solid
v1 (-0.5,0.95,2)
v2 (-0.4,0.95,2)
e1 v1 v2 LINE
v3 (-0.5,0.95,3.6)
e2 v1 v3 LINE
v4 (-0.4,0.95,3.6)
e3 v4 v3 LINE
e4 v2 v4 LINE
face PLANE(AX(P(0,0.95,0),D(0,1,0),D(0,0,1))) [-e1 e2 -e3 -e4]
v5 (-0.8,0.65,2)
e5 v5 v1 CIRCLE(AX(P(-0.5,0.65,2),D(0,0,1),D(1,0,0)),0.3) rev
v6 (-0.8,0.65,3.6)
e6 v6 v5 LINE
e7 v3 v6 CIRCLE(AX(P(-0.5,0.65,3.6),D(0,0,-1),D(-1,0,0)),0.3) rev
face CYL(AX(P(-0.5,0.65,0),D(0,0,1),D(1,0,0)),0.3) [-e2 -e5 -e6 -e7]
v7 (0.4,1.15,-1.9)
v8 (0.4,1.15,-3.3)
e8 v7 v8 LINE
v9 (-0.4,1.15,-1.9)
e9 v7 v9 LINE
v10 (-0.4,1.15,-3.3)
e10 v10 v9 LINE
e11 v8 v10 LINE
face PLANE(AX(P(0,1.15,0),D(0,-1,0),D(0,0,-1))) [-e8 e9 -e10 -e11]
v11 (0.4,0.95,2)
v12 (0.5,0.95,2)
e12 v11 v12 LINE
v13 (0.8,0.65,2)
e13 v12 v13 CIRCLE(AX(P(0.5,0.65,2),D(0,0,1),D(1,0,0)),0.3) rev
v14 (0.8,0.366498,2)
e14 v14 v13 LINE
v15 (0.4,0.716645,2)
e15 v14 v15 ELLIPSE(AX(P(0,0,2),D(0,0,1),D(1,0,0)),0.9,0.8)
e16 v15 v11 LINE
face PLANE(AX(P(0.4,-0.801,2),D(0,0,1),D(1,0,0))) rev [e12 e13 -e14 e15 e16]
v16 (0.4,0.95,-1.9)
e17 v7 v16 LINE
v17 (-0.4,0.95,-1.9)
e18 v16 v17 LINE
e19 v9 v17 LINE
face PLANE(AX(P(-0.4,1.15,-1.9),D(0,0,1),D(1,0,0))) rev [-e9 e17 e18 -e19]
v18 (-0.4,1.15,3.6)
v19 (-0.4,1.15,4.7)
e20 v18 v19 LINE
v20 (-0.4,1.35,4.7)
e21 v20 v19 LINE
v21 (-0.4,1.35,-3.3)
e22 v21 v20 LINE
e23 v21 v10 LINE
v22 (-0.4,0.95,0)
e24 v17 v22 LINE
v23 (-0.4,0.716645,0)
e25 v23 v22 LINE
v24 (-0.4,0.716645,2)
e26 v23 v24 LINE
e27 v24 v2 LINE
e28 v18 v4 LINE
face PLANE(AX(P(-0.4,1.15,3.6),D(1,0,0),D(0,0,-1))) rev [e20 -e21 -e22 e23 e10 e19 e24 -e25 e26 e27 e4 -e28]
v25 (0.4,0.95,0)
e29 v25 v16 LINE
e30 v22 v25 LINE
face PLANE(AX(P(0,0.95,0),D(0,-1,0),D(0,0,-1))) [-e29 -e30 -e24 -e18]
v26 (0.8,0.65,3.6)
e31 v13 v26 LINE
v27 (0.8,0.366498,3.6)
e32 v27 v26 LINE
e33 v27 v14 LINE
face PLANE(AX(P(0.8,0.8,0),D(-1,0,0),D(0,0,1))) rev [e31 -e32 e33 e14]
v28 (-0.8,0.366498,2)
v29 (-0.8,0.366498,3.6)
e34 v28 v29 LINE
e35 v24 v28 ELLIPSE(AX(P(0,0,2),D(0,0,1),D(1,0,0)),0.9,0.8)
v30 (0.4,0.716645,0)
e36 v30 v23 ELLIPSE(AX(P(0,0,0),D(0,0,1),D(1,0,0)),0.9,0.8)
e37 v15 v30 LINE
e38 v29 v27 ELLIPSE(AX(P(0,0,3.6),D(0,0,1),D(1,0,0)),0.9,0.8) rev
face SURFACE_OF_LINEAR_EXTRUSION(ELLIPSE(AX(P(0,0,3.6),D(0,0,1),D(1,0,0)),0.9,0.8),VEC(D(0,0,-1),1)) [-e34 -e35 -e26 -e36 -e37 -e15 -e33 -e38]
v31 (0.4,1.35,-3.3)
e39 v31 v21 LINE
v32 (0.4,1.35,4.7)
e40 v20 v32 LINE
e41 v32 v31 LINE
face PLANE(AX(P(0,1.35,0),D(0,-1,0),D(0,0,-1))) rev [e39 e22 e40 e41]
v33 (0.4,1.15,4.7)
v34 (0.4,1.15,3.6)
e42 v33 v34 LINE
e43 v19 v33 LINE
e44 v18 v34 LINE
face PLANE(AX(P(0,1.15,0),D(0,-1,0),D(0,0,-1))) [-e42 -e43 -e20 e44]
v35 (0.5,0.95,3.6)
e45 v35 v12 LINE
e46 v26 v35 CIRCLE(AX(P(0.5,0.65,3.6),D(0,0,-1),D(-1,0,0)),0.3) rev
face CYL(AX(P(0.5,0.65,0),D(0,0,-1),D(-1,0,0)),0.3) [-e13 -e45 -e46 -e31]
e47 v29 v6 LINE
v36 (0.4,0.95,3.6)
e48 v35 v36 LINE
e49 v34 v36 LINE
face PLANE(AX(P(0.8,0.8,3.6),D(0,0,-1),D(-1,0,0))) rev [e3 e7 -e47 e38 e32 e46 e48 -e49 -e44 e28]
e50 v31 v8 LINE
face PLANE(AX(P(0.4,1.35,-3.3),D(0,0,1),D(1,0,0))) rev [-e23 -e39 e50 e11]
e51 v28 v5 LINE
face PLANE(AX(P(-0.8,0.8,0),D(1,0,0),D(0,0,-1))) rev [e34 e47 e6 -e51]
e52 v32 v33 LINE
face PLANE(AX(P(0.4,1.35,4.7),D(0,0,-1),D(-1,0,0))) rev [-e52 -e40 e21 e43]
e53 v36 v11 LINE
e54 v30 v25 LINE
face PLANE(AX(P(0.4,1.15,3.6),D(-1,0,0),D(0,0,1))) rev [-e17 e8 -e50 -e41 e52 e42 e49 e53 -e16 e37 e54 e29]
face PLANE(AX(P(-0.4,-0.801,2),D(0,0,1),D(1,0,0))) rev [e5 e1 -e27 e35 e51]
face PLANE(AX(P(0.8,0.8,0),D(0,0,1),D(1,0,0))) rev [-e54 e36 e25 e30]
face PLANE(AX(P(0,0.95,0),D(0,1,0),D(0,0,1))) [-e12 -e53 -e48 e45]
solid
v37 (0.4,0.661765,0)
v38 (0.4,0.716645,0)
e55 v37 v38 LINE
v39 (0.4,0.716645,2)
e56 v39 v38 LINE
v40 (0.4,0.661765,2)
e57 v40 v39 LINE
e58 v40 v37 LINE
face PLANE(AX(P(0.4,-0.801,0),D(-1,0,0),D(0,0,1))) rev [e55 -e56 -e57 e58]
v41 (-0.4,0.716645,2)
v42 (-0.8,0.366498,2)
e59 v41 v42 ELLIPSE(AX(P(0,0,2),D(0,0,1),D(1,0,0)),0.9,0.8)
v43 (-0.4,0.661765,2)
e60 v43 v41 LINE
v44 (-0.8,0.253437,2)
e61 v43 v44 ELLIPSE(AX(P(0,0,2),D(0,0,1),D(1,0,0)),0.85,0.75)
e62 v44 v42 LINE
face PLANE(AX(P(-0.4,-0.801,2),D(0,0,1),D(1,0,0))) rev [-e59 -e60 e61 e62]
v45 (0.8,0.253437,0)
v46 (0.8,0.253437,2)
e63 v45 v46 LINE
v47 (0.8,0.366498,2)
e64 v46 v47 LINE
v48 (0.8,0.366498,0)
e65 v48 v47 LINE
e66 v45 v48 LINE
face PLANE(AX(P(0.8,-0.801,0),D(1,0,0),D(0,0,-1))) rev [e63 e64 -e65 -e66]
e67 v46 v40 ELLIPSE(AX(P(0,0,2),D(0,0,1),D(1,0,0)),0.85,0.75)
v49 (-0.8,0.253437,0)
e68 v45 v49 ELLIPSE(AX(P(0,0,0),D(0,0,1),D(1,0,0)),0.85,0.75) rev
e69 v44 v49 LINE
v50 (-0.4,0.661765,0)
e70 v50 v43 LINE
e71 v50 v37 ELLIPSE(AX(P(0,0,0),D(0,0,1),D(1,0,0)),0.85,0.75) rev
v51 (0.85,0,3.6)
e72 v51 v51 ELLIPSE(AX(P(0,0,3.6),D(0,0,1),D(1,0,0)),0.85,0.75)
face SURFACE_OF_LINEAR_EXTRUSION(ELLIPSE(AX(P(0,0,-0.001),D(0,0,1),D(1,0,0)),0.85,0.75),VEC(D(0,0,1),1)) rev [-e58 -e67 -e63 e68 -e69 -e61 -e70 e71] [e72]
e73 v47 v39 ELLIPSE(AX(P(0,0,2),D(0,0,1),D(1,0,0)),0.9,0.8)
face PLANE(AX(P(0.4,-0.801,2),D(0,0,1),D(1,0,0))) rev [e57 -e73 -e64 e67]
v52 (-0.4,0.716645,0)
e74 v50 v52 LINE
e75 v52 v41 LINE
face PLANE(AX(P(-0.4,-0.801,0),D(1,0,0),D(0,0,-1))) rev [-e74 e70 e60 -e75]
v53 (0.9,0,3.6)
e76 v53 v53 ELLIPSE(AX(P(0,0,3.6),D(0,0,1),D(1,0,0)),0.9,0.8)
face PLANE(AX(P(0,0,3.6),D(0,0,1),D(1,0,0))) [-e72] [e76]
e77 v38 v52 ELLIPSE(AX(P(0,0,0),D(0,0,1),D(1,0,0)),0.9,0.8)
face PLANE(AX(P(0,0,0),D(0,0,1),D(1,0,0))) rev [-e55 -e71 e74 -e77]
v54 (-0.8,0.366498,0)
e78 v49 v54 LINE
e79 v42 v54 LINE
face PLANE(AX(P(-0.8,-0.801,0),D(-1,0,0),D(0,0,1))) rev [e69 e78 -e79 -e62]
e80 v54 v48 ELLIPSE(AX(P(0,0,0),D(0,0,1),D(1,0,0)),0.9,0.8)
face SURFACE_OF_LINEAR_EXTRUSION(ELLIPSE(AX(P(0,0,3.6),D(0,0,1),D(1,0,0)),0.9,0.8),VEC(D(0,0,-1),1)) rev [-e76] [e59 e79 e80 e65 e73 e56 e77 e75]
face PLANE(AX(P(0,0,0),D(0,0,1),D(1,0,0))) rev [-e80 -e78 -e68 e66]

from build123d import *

# Parameters (mm, degrees)
SKETCH1_RX          = 0.9
SKETCH1_RY          = 0.8
BOSS_EXTRUDE1_DEPTH = 3.6
CUT_EXTRUDE2_REACH  = 5.796
SKETCH2_RX          = 0.85
SKETCH2_RY          = 0.75
BOSS_EXTRUDE3_DEPTH = 3.6
SKETCH3_W           = 0.8
SKETCH3_H           = 5.5
BOSS_EXTRUDE4_DEPTH = 0.2
SKETCH4_W           = 0.8
SKETCH4_H           = 8
BOSS_EXTRUDE5_DEPTH = 0.2
FILLET2_R           = 0.3
CUT_EXTRUDE4_START  = -0.696564
SKETCH5_W           = 0.4
SKETCH5_H           = 2
CUT_EXTRUDE4_DEPTH  = 0.696564


# Read off the part's stored shape, not the designer's step: Boss-Extrude3
with BuildPart() as part:
    # Sketch1 → Boss-Extrude1 (new body)
    with BuildSketch(Plane.XY):
        with Locations((0, 0)):
            Ellipse(SKETCH1_RX, SKETCH1_RY)
    extrude(amount=BOSS_EXTRUDE1_DEPTH)

    # Sketch2 → Cut-Extrude2 (cut, up to next)
    with BuildSketch(Plane.XY.offset(3.6), mode=Mode.PRIVATE) as cut_extrude2_sk1:
        with Locations((0, 0)):
            Ellipse(SKETCH2_RX, SKETCH2_RY)
    cut_extrude2_tool1 = extrude(cut_extrude2_sk1.sketch, amount=-CUT_EXTRUDE2_REACH, mode=Mode.PRIVATE) & part.part
    add(cut_extrude2_tool1.solids().sort_by_distance((0, 0, 3.6))[0], mode=Mode.SUBTRACT)


with BuildPart() as body_2:
    # Boss-Extrude3 outline → Boss-Extrude3 (new body)
    with BuildSketch(Plane.XY):
        with BuildLine():
            Line((0.8, 0.366498278), (0.8, 0.95))
            Line((0.8, 0.95), (-0.8, 0.95))
            Line((-0.8, 0.95), (-0.8, 0.366498278))
            add(Edge.make_bspline(
                [(0.8, 0.366498278), (0, 1.7462565), (-0.8, 0.366498278)],
                knots=[0.47588225, 0.47588225, 0.47588225, 2.665710404, 2.665710404, 2.665710404], degree=2, weights=[1, 0.458122847, 1]))
        make_face()
    extrude(amount=BOSS_EXTRUDE3_DEPTH)

    # Sketch3 → Boss-Extrude4 (add)
    with BuildSketch(Plane(origin=(0, 0.95, 0), x_dir=(1, 0, 0), z_dir=(0, 1, 0))):
        with Locations((0, -0.85)):
            Rectangle(SKETCH3_W, SKETCH3_H)
    extrude(amount=BOSS_EXTRUDE4_DEPTH)

    # Sketch4 → Boss-Extrude5 (add)
    with BuildSketch(Plane(origin=(0, 1.15, 0), x_dir=(1, 0, 0), z_dir=(0, 1, 0))):
        with Locations((0, -0.7)):
            Rectangle(SKETCH4_W, SKETCH4_H)
    extrude(amount=BOSS_EXTRUDE5_DEPTH)

    # Fillet2
    fillet2_edges = [body_2.edges().sort_by_distance(p)[0] for p in [
        (0.8, 0.95, 1.8),
        (-0.8, 0.95, 1.8),
    ]]
    fillet(fillet2_edges, radius=FILLET2_R)


with BuildPart() as cut_extrude4_tool:
    # Sketch5 → Cut-Extrude4 (new body)
    with BuildSketch(Plane(origin=(0, 0.95, 0), x_dir=(1, 0, 0), z_dir=(0, 1, 0)).offset(CUT_EXTRUDE4_START)):
        with Locations((-0.6, -1)):
            Rectangle(SKETCH5_W, SKETCH5_H)
        with Locations((0.6, -1)):
            Rectangle(SKETCH5_W, SKETCH5_H)
    extrude(amount=CUT_EXTRUDE4_DEPTH)


with BuildPart() as part_1:
    add(part.part)

    # Cut-Extrude4: cut by cut_extrude4_tool
    add(cut_extrude4_tool.part, mode=Mode.SUBTRACT)


with BuildPart() as body_2_1:
    add(body_2.part)

    # Cut-Extrude4: cut by cut_extrude4_tool
    add(cut_extrude4_tool.part, mode=Mode.SUBTRACT)


solid = Compound([part_1.part, body_2_1.part])
